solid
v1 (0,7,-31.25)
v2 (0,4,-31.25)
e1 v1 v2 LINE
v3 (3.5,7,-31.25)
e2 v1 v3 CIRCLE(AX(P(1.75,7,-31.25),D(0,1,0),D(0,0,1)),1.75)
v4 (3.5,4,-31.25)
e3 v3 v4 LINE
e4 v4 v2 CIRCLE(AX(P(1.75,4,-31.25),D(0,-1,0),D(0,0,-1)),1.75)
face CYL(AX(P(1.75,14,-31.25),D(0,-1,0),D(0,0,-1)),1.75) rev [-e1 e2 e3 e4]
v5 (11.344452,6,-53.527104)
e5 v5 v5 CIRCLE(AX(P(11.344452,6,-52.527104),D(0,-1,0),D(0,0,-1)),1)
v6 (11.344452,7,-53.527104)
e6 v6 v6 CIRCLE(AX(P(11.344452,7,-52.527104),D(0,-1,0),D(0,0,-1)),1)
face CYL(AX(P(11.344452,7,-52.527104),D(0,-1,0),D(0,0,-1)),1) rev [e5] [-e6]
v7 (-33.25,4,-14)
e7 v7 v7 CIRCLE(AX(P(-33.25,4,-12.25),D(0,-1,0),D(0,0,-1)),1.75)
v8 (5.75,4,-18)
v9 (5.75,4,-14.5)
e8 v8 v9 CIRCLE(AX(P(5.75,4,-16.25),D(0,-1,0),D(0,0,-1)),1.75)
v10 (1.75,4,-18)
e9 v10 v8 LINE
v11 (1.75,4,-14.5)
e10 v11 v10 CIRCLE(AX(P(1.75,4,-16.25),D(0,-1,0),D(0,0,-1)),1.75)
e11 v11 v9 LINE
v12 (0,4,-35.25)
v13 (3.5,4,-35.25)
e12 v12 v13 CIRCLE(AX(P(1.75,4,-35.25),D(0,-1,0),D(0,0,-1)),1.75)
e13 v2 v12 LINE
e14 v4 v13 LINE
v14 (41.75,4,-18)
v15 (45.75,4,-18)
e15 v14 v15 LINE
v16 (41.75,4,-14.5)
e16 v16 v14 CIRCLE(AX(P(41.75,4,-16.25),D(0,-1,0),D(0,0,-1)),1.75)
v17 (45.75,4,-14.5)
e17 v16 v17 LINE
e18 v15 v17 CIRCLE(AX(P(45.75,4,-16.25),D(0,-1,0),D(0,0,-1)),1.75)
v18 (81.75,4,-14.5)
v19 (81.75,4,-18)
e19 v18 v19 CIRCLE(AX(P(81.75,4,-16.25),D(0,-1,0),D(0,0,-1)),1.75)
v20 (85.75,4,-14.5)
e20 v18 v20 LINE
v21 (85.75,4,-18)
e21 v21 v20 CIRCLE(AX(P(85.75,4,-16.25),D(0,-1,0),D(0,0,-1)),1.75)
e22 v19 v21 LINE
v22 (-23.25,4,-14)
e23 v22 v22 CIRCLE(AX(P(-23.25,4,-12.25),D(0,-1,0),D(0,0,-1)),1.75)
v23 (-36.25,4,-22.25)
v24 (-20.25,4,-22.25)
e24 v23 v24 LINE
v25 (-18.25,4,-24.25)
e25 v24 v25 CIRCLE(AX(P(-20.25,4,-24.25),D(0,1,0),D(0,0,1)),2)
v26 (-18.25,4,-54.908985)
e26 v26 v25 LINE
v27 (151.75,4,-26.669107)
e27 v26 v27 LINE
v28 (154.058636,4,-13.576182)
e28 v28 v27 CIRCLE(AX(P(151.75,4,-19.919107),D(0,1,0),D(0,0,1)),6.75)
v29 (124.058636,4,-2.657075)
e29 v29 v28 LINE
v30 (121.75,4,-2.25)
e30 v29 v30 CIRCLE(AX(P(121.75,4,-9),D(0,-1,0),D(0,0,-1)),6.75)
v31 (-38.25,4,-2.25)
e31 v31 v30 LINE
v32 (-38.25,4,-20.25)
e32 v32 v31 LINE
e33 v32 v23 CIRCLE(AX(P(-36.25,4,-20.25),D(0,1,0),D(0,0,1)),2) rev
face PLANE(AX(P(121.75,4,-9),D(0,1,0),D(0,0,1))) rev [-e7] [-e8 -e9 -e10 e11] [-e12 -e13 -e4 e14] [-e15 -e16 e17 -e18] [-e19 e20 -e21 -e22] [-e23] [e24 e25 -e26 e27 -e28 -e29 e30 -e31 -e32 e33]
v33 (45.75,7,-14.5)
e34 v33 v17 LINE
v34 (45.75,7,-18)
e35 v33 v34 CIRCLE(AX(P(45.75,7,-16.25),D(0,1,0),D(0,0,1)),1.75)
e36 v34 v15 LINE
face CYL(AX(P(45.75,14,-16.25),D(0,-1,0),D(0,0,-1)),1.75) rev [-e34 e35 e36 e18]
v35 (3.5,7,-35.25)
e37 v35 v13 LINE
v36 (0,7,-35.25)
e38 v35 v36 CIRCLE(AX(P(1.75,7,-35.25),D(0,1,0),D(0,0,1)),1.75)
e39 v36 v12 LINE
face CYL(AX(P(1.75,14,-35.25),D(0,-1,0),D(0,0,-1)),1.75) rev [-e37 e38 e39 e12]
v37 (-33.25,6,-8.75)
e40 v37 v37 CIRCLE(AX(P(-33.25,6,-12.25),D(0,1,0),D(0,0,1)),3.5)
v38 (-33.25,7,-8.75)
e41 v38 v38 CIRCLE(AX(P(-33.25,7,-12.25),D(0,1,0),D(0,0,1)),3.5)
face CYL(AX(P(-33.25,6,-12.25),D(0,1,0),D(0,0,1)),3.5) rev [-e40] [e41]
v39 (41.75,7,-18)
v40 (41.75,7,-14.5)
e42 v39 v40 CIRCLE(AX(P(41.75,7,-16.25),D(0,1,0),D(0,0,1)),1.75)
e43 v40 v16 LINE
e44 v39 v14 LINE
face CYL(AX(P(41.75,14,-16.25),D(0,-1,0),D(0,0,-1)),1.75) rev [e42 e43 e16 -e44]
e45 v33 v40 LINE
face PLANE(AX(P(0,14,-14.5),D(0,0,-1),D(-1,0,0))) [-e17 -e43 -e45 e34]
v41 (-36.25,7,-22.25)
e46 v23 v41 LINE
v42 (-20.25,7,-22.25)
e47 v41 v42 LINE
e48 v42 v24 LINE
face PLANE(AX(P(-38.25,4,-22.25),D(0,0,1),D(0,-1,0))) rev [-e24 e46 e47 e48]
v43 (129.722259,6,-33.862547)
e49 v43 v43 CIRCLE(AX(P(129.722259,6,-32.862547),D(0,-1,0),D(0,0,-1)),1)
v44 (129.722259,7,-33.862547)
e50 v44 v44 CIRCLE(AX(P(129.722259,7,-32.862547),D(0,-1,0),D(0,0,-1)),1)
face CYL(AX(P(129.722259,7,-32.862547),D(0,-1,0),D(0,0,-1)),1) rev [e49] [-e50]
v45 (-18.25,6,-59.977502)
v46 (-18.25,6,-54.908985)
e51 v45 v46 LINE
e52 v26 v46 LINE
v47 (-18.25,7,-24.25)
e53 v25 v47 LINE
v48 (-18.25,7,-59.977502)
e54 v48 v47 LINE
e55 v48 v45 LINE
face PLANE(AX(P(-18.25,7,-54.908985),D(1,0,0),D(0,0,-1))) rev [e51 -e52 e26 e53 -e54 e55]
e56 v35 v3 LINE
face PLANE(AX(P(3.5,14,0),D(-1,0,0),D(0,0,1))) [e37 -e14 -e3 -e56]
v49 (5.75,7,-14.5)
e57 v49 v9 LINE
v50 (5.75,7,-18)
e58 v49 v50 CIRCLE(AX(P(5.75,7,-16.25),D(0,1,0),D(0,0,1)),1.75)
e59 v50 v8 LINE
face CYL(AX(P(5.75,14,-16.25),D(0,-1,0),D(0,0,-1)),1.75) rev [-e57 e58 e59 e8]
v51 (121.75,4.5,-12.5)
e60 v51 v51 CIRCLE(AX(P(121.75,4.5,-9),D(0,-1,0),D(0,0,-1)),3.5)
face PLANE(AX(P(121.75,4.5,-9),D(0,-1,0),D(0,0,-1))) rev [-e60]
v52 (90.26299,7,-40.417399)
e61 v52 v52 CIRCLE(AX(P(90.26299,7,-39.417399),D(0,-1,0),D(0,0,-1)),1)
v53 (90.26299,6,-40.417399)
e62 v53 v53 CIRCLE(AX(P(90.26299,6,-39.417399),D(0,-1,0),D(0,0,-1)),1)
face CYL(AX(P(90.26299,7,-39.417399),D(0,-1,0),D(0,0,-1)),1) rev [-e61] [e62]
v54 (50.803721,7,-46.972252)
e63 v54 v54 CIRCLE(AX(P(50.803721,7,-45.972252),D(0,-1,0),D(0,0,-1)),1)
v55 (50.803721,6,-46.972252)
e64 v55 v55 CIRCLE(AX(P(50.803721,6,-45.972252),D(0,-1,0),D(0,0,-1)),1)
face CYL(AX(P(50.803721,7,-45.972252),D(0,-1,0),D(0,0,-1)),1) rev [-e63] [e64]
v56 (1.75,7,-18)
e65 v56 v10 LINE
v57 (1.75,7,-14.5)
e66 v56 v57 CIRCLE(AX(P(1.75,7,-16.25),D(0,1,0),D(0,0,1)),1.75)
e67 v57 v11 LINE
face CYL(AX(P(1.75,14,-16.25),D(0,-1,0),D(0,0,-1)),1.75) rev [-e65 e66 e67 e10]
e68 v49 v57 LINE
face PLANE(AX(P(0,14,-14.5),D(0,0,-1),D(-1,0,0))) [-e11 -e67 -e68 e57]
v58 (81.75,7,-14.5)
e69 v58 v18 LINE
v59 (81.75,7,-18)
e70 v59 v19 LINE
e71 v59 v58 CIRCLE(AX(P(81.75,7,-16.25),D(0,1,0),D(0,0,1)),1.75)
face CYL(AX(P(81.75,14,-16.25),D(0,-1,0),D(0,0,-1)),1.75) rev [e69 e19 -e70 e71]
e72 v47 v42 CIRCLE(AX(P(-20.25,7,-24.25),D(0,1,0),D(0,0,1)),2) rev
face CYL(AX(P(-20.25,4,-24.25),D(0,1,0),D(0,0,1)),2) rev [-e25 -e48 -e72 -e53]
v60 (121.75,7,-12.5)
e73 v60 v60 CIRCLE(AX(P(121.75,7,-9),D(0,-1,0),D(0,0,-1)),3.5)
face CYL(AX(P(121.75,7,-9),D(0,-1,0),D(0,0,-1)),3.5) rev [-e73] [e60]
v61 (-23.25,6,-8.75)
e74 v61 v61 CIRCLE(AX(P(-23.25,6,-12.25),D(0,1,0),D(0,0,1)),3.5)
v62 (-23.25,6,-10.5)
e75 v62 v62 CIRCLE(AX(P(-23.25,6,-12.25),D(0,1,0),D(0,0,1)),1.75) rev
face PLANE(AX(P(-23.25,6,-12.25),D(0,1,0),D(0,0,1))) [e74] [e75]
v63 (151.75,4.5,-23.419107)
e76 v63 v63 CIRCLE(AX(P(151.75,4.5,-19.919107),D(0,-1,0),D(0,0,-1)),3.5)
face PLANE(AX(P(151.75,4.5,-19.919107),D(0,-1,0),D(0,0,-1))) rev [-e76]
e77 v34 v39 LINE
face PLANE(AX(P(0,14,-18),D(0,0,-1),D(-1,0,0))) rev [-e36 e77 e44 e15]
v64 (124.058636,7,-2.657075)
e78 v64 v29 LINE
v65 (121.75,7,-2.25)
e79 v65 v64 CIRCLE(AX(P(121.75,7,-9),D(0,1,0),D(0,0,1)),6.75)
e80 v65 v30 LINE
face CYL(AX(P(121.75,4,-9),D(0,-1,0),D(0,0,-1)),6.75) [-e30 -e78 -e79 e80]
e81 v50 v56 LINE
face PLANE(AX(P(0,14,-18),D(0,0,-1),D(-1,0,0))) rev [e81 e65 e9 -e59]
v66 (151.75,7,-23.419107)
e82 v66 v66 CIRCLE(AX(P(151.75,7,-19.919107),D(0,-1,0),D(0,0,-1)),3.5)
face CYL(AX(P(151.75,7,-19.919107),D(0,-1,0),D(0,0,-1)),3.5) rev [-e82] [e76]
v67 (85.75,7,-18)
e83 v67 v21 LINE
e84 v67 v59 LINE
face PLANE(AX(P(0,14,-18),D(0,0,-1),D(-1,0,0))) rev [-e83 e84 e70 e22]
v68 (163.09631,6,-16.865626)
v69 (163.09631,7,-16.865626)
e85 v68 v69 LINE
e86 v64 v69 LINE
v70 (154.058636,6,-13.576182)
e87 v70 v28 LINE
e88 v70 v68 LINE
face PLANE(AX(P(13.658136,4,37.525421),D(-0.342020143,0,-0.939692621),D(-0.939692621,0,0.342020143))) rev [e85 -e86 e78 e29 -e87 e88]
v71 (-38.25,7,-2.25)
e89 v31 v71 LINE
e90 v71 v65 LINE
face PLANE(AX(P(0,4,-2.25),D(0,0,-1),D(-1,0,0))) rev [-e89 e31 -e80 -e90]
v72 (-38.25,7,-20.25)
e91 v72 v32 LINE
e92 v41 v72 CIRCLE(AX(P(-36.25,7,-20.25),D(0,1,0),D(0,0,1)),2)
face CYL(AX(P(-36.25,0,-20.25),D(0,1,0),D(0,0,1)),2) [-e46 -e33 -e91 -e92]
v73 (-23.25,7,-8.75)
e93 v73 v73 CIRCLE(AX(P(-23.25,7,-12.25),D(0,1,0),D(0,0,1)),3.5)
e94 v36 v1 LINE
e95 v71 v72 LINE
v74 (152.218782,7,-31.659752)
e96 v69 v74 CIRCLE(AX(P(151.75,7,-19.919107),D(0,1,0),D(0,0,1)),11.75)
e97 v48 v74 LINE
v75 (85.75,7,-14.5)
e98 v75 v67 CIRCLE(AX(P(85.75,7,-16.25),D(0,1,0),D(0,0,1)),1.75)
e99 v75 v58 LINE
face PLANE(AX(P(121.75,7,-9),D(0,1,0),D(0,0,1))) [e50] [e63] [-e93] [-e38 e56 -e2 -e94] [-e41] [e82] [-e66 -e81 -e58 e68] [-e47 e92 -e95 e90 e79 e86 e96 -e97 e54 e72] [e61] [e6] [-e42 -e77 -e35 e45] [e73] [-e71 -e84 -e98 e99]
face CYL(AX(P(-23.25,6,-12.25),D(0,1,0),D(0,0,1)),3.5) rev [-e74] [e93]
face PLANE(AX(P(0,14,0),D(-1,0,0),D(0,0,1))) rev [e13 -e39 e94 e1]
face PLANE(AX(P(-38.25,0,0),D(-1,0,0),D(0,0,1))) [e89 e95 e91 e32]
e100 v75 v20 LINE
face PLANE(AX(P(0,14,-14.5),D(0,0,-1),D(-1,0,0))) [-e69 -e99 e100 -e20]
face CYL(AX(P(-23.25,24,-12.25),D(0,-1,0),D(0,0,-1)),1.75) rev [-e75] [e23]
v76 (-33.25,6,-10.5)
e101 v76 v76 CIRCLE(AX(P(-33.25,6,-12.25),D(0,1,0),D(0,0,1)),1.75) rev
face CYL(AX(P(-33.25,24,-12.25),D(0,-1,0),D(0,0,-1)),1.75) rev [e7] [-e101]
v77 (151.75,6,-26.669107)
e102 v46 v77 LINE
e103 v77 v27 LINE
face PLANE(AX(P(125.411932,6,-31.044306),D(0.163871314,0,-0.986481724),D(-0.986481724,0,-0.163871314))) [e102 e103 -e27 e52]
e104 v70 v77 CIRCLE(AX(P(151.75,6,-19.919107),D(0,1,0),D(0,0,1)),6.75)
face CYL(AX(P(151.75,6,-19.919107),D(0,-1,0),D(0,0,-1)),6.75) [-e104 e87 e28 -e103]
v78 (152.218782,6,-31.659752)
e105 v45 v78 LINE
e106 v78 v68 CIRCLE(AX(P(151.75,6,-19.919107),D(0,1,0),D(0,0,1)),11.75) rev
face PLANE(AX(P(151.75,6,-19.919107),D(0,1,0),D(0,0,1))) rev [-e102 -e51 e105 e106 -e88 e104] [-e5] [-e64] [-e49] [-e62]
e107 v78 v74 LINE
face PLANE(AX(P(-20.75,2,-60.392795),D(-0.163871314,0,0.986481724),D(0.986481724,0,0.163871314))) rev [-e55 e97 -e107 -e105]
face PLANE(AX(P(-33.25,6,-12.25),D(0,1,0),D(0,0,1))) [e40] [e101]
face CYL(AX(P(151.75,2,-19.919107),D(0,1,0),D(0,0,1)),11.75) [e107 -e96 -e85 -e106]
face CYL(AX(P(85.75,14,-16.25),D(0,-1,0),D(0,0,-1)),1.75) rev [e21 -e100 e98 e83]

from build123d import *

# Parameters (mm, degrees)
SKETCH_1_W           = 35
SKETCH_1_H           = 55
EXTRUDE_1_DEPTH      = 1
EXTRUDE_2_DEPTH      = 3
SKETCH_3_R           = 5
CUT_EXTRUDE_1_DEPTH  = 169.569903897
SKETCH_4_R           = 4
CUT_EXTRUDE_2_DEPTH  = 2
SKETCH_5_R           = 2
CUT_EXTRUDE_3_DEPTH  = 2
EXTRUDE_START        = 7
EXTRUDE_3_DEPTH      = 7
CUT_EXTRUDE_START    = -1.5
SKETCH_9_W           = 10
SKETCH_9_H           = 26
CUT_EXTRUDE_4_DEPTH  = 168.318874833
SKETCH_10_R          = 1.5
CUT_EXTRUDE_5_DEPTH  = 194.595583627
EXTRUDE_4_DEPTH      = 3
SKETCH_13_W          = 334.012533363
SKETCH_13_H          = 161.456209481
CUT_EXTRUDE_6_DEPTH  = 10
CUT_EXTRUDE_START_2  = -0.5
SKETCH_14_R          = 3.5
CUT_EXTRUDE_7_DEPTH  = 179.354165453
SKETCH_15_R          = 5
CUT_EXTRUDE_8_DEPTH  = 179.854165453
EXTRUDE_START_2      = -3
EXTRUDE_5_DEPTH      = 16
EXTRUDE_7_DEPTH      = 7
SKETCH_24_W          = 10
SKETCH_24_H          = 26
CUT_EXTRUDE_11_DEPTH = 180.209193181
SKETCH_25_R          = 1.5
CUT_EXTRUDE_12_DEPTH = 176.793913433
THREAD_2_PITCH       = 0.6
CUT_EXTRUDE_13_DEPTH = 181.709193232
EXTRUDE_START_3      = 2
SKETCH_27_R          = 5
EXTRUDE_8_DEPTH      = 2
CUT_EXTRUDE_START_3  = -2
SKETCH_28_W          = 25
SKETCH_28_H          = 47.640496167
CUT_EXTRUDE_14_DEPTH = 182.247184378
SKETCH_29_R          = 7.5
CUT_EXTRUDE_15_DEPTH = 4
CUT_EXTRUDE_16_DEPTH = 10
SKETCH_32_R          = 1.896812978
CUT_EXTRUDE_17_DEPTH = 10
CUT_EXTRUDE_START_4  = -19
CUT_EXTRUDE_18_DEPTH = 2
CUT_EXTRUDE_19_DEPTH = 180.762490825
CUT_EXTRUDE_20_DEPTH = 176.782687167
CUT_EXTRUDE_21_DEPTH = 175.343166372
SKETCH_37_R          = 1
CUT_EXTRUDE_22_DEPTH = 175.199743974
EXTRUDE_START_4      = -1
SKETCH_39_R          = 5
EXTRUDE_9_DEPTH      = 1
SKETCH_40_W          = 2.395962652
SKETCH_40_H          = 5.687033247
CUT_EXTRUDE_23_DEPTH = 192.518571686
SKETCH_41_W          = 88.49347393
SKETCH_41_H          = 24.829104196
CUT_EXTRUDE_24_DEPTH = 192.518571686
SKETCH_42_W          = 20
SKETCH_42_H          = 3
EXTRUDE_10_DEPTH     = 20
SKETCH_43_R          = 1.75
CUT_EXTRUDE_25_DEPTH = 20
SKETCH_45_R          = 3.5
CUT_EXTRUDE_26_DEPTH = 1
FILLET_1_R           = 2


with BuildPart() as part:
    # 草图1 → 凸台-拉伸1 (new body)
    with BuildSketch(Plane(origin=(0, 0, 0), x_dir=(1, 0, 0), z_dir=(0, 1, 0))):
        Rectangle(SKETCH_1_W, SKETCH_1_H)
    extrude(amount=EXTRUDE_1_DEPTH)

    # Sketch 2 → 凸台-拉伸2 (add)
    with BuildSketch(Plane(origin=(0, 1, 0), x_dir=(1, 0, 0), z_dir=(0, 1, 0))):
        with BuildLine():
            Line((106.75, -2.25), (106.75, 2.25))
            Line((106.75, 2.25), (121.75, 2.25))
            ThreePointArc((121.75, 2.25), (122.922125199, 2.352547667), (124.058635967, 2.65707481))
            Line((124.058635967, 2.65707481), (154.058635967, 13.576181838))
            ThreePointArc((154.058635967, 13.576181838), (158.397452333, 21.091232227), (151.75, 26.669107028))
            Line((151.75, 26.669107028), (-31.447415548, 57.101298968))
            ThreePointArc((-31.447415548, 57.101298968), (-37.800418235, 56.264673928), (-42.609265279, 52.029632639))
            Line((-42.609265279, 52.029632639), (-60.161792173, 23.605896086))
            ThreePointArc((-60.161792173, 23.605896086), (-61.717833724, 20.073278016), (-62.25, 16.25))
            Line((-62.25, 16.25), (-62.25, -16.25))
            ThreePointArc((-62.25, -16.25), (-61.717833724, -20.073278016), (-60.161792173, -23.605896086))
            Line((-60.161792173, -23.605896086), (-42.609265279, -52.029632639))
            ThreePointArc((-42.609265279, -52.029632639), (-37.800418235, -56.264673928), (-31.447415548, -57.101298968))
            Line((-31.447415548, -57.101298968), (151.75, -26.669107028))
            ThreePointArc((151.75, -26.669107028), (158.397452333, -21.091232227), (154.058635967, -13.576181838))
            Line((154.058635967, -13.576181838), (124.058635967, -2.65707481))
            ThreePointArc((124.058635967, -2.65707481), (122.922125199, -2.352547667), (121.75, -2.25))
            Line((121.75, -2.25), (106.75, -2.25))
        make_face()
    extrude(amount=EXTRUDE_2_DEPTH)

    # 草图3 → 切除-拉伸1 (cut, through all)
    with BuildSketch(Plane(origin=(0, 4, 0), x_dir=(1, 0, 0), z_dir=(0, 1, 0))):
        with Locations(Location((-48.25, 16.25, 0), (0, 0, 270))):
            Circle(SKETCH_3_R)
        with Locations(Location((-48.25, -16.25, 0), (0, 0, 270))):
            Circle(SKETCH_3_R)
    extrude(amount=-CUT_EXTRUDE_1_DEPTH, mode=Mode.SUBTRACT)

    # 草图4 → 切除-拉伸2 (cut)
    with BuildSketch(Plane(origin=(0, 4, 0), x_dir=(1, 0, 0), z_dir=(0, 1, 0))):
        with Locations(Location((-33.25, 46.25, 0), (0, 0, 270))):
            Circle(SKETCH_4_R)
        with Locations(Location((-33.25, -46.25, 0), (0, 0, 270))):
            Circle(SKETCH_4_R)
    extrude(amount=-CUT_EXTRUDE_2_DEPTH, mode=Mode.SUBTRACT)

    # 草图5 → 切除-拉伸3 (cut)
    with BuildSketch(Plane(origin=(0, 4, 0), x_dir=(1, 0, 0), z_dir=(0, 1, 0))):
        with Locations(Location((121.75, 9, 0), (0, 0, 270))):
            Circle(SKETCH_5_R)
        with Locations(Location((121.75, -9, 0), (0, 0, 270))):
            Circle(SKETCH_5_R)
        with Locations(Location((151.75, 19.919107028, 0), (0, 0, 270))):
            Circle(SKETCH_5_R)
        with Locations(Location((151.75, -19.919107028, 0), (0, 0, 270))):
            Circle(SKETCH_5_R)
    extrude(amount=-CUT_EXTRUDE_3_DEPTH, mode=Mode.SUBTRACT)

    # 草图8 → 凸台-拉伸3 (add)
    with BuildSketch(Plane.XZ.offset(-1).offset(EXTRUDE_START)):
        with BuildLine():
            Line((-26.75, -26.25), (-39.75, -26.25))
            Line((-39.75, -26.25), (-39.75, -55.124119675))
            ThreePointArc((-39.75, -55.124119675), (-35.798281322, -56.950759894), (-31.447415548, -57.101298968))
            Line((-31.447415548, -57.101298968), (-26.75, -56.320978726))
            Line((-26.75, -56.320978726), (-26.75, -26.25))
        make_face()
    extrude_3 = extrude(amount=-EXTRUDE_3_DEPTH)

    # 镜向1: 凸台-拉伸3 across plane
    add(extrude_3.mirror(Plane.XY))

    # 草图9 → 切除-拉伸4 (cut, through all)
    with BuildSketch(Plane.XZ.offset(6).offset(CUT_EXTRUDE_START)):
        with Locations((-33.25, -40.75)):
            Rectangle(SKETCH_9_W, SKETCH_9_H)
    cut_extrude_4 = extrude(amount=-CUT_EXTRUDE_4_DEPTH, mode=Mode.SUBTRACT)

    # 镜向2: 切除-拉伸4 across plane
    add(cut_extrude_4.mirror(Plane.XY), mode=Mode.SUBTRACT)

    # 草图10 → 切除-拉伸5 (cut, through all)
    with BuildSketch(Plane.XY.offset(-53.75)):
        with Locations((-33.25, -1.5)):
            Circle(SKETCH_10_R)
    cut_extrude_5 = extrude(amount=-CUT_EXTRUDE_5_DEPTH, mode=Mode.SUBTRACT)

    # 镜向3: 切除-拉伸5 across plane
    add(cut_extrude_5.mirror(Plane.XY), mode=Mode.SUBTRACT)

    # 草图12 → 凸台-拉伸4 (add)
    with BuildSketch(Plane(origin=(0, 4, 0), x_dir=(1, 0, 0), z_dir=(0, 1, 0))):
        with BuildLine():
            Line((152.536154407, 34.648141662), (-30.136445037, 64.993152763))
            ThreePointArc((-30.136445037, 64.993152763), (-32.296727103, 65.226071005), (-34.469475839, 65.210824842))
            Line((-34.469475839, 65.210824842), (-60.161792173, 23.605896086))
            ThreePointArc((-60.161792173, 23.605896086), (-61.717833724, 20.073278016), (-62.25, 16.25))
            Line((-62.25, 16.25), (-62.25, 2.25))
            Line((-62.25, 2.25), (121.75, 2.25))
            ThreePointArc((121.75, 2.25), (122.922125199, 2.352547667), (124.058635967, 2.65707481))
            Line((124.058635967, 2.65707481), (166.382589153, 18.061733966))
            ThreePointArc((166.382589153, 18.061733966), (163.073058037, 29.371665237), (152.536154407, 34.648141662))
        make_face()
    extrude(amount=EXTRUDE_4_DEPTH)

    # 草图13 → 切除-拉伸6 (cut)
    with BuildSketch(Plane.XZ.offset(-4)):
        with Locations((47.836319436, 6.16656882)):
            Rectangle(SKETCH_13_W, SKETCH_13_H)
    extrude(amount=CUT_EXTRUDE_6_DEPTH, mode=Mode.SUBTRACT)

    # 草图14 → 切除-拉伸7 (cut, through all)
    with BuildSketch(Plane.XZ.offset(-4).offset(CUT_EXTRUDE_START_2)):
        with Locations(Location((151.75, -19.919107028, 0), (0, 0, 270))):
            Circle(SKETCH_14_R)
        with Locations(Location((121.75, -9, 0), (0, 0, 270))):
            Circle(SKETCH_14_R)
    extrude(amount=-CUT_EXTRUDE_7_DEPTH, mode=Mode.SUBTRACT)

    # 草图15 → 切除-拉伸8 (cut, through all)
    with BuildSketch(Plane.XZ.offset(-4)):
        with Locations(Location((-48.25, -16.25, 0), (0, 0, 270))):
            Circle(SKETCH_15_R)
    extrude(amount=-CUT_EXTRUDE_8_DEPTH, mode=Mode.SUBTRACT)

    # 草图17 → 凸台-拉伸5 (add)
    with BuildSketch(Plane.XZ.offset(-4).offset(EXTRUDE_START_2)):
        with BuildLine():
            Line((-30.628058978, -62.03370759), (152.218782473, -31.659751942))
            ThreePointArc((152.218782473, -31.659751942), (161.216553887, -26.879484712), (163.096310198, -16.865626245))
            Line((163.096310198, -16.865626245), (166.382589153, -18.061733966))
            ThreePointArc((166.382589153, -18.061733966), (163.073058037, -29.371665237), (152.536154407, -34.648141662))
            Line((152.536154407, -34.648141662), (-30.136445037, -64.993152763))
            ThreePointArc((-30.136445037, -64.993152763), (-32.296727103, -65.226071005), (-34.469475839, -65.210824842))
            Line((-34.469475839, -65.210824842), (-36.504423199, -61.915526791))
            ThreePointArc((-36.504423199, -61.915526791), (-33.571714316, -62.246765295), (-30.628058978, -62.03370759))
        make_face()
    extrude(amount=-EXTRUDE_5_DEPTH)

    # 草图23 → 凸台-拉伸7 (add)
    with BuildSketch(Plane.XZ.offset(-4).offset(EXTRUDE_START)):
        with BuildLine():
            Line((-39.75, -56.65979236), (-39.75, -26.25))
            Line((-39.75, -26.25), (-26.75, -26.25))
            Line((-26.75, -26.25), (-26.75, -64.430606916))
            Line((-26.75, -64.430606916), (-30.136445037, -64.993152763))
            ThreePointArc((-30.136445037, -64.993152763), (-32.296727103, -65.226071005), (-34.469475839, -65.210824842))
            Line((-34.469475839, -65.210824842), (-39.75, -56.65979236))
        make_face()
    extrude(amount=-EXTRUDE_7_DEPTH)

    # 草图24 → 切除-拉伸11 (cut, through all)
    with BuildSketch(Plane.XZ.offset(3).offset(CUT_EXTRUDE_START)):
        with Locations((-33.25, -40.75)):
            Rectangle(SKETCH_24_W, SKETCH_24_H)
    extrude(amount=-CUT_EXTRUDE_11_DEPTH, mode=Mode.SUBTRACT)

    # 草图25 → 切除-拉伸12 (cut, through all)
    with BuildSketch(Plane.XY.offset(-53.75)):
        with Locations((-33.25, 1.5)):
            Circle(SKETCH_25_R)
    extrude(amount=-CUT_EXTRUDE_12_DEPTH, mode=Mode.SUBTRACT)

    # 螺纹线2: the profile of Sketch 2 2 profile screwed along a right-hand helix of 25 turns, 6 arcs to a turn; built about Z, then put on its axis
    thread_2_z = Axis((0, 0, 0), (0, 0, 1))
    thread_2_corners = [(1.4997, 0, -0.000173205), (1.824759525, 0, 0.187499999), (1.824759525, 0, 0.262499999), (1.4997, 0, 0.450173203)]
    with BuildLine(mode=Mode.PRIVATE) as thread_2_profile:
        Line(thread_2_corners[0], thread_2_corners[1])
        Line(thread_2_corners[1], thread_2_corners[2])
        Line(thread_2_corners[2], thread_2_corners[3])
        Line(thread_2_corners[3], thread_2_corners[0])
    thread_2_cap = Face(thread_2_profile.wire())
    thread_2_turn_angles = [0, 30, 60, 90, 120, 150, 180, 210, 240, 270, 300, 330, 360]
    thread_2_turn_weights = [1, 0.8660254037844387, 1, 0.8660254037844387, 1, 0.8660254037844387, 1, 0.8660254037844387, 1, 0.8660254037844387, 1, 0.8660254037844387, 1]
    thread_2_turn_rails = [Edge.make_bspline([Vector(p[0], p[1], 0).rotate(thread_2_z, thread_2_turn_angles[k]) / thread_2_turn_weights[k] + Vector(0, 0, p[2] + THREAD_2_PITCH * thread_2_turn_angles[k] / 360) for k in range(13)], [0, 0, 0, 1, 1, 2, 2, 3, 3, 4, 4, 5, 5, 6, 6, 6], 2, thread_2_turn_weights) for p in thread_2_corners]
    thread_2_turn_sides = [Face.make_surface_from_curves(thread_2_turn_rails[p[0]], thread_2_turn_rails[p[1]]) for p in [(0, 1), (1, 2), (2, 3), (3, 0)]]
    thread_2 = Plane(origin=(-33.25, 1.5, -53.75), x_dir=(-1, 0, 0), z_dir=(0, 0, -1)) * Solid(Shell([*[p.moved(Location((0, 0, THREAD_2_PITCH * i))) for i in range(25) for p in thread_2_turn_sides], thread_2_cap, thread_2_cap.rotate(thread_2_z, 9000).moved(Location((0, 0, THREAD_2_PITCH * 9000 / 360)))]))
    add(thread_2, mode=Mode.SUBTRACT)

    # 草图26 → 切除-拉伸13 (cut, through all)
    with BuildSketch(Plane.XZ.offset(3)):
        with BuildLine():
            Line((-26.75, -64.430606916), (-26.75, -26.25))
            Line((-26.75, -26.25), (-39.75, -26.25))
            Line((-39.75, -26.25), (-39.75, -56.65979236))
            Line((-39.75, -56.65979236), (-34.469475839, -65.210824842))
            ThreePointArc((-34.469475839, -65.210824842), (-32.296727103, -65.226071005), (-30.136445037, -64.993152763))
            Line((-30.136445037, -64.993152763), (-26.75, -64.430606916))
        make_face()
    extrude(amount=-CUT_EXTRUDE_13_DEPTH, mode=Mode.SUBTRACT)

    # 草图27 → 凸台-拉伸8 (add)
    with BuildSketch(Plane.XZ.offset(-4).offset(EXTRUDE_START_3)):
        with BuildLine():
            Line((-39.75, -56.65979236), (-39.75, -26.25))
            Line((-39.75, -26.25), (-26.75, -26.25))
            Line((-26.75, -26.25), (-26.75, -64.430606916))
            Line((-26.75, -64.430606916), (-18.25, -63.018613025))
            Line((-18.25, -63.018613025), (-18.25, -2.25))
            Line((-18.25, -2.25), (-62.25, -2.25))
            Line((-62.25, -2.25), (-62.25, -16.25))
            ThreePointArc((-62.25, -16.25), (-61.717833724, -20.073278016), (-60.161792173, -23.605896086))
            Line((-60.161792173, -23.605896086), (-39.75, -56.65979236))
        make_face()
        with Locations(Location((-48.25, -16.25, 0), (0, 0, 270))):
            Circle(SKETCH_27_R, mode=Mode.SUBTRACT)
    extrude(amount=-EXTRUDE_8_DEPTH)

    # 草图28 → 切除-拉伸14 (cut, through all)
    with BuildSketch(Plane(origin=(0, 7, 0), x_dir=(1, 0, 0), z_dir=(0, 1, 0)).offset(CUT_EXTRUDE_START_3)):
        with Locations((-33.25, 50.070248084)):
            Rectangle(SKETCH_28_W, SKETCH_28_H)
    extrude(amount=CUT_EXTRUDE_14_DEPTH, mode=Mode.SUBTRACT)

    # 草图29 → 切除-拉伸15 (cut)
    with BuildSketch(Plane(origin=(0, 7, 0), x_dir=(1, 0, 0), z_dir=(0, 1, 0))):
        with Locations(Location((-48.25, 16.25, 0), (0, 0, 270))):
            Circle(SKETCH_29_R)
    extrude(amount=-CUT_EXTRUDE_15_DEPTH, mode=Mode.SUBTRACT)

    # 草图31 → 切除-拉伸16 (cut)
    with BuildSketch(Plane.XZ.offset(-4)):
        with BuildLine():
            Line((7.5, -16.25), (0, -16.25))
            ThreePointArc((0, -16.25), (0.512563133, -17.487436867), (1.75, -18))
            Line((1.75, -18), (5.75, -18))
            ThreePointArc((5.75, -18), (6.987436867, -17.487436867), (7.5, -16.25))
        make_face()
        with BuildLine():
            ThreePointArc((1.75, -14.5), (0.512563133, -15.012563133), (0, -16.25))
            Line((0, -16.25), (7.5, -16.25))
            ThreePointArc((7.5, -16.25), (6.987436867, -15.012563133), (5.75, -14.5))
            Line((5.75, -14.5), (1.75, -14.5))
        make_face()
        with BuildLine():
            Line((47.5, -16.25), (40, -16.25))
            ThreePointArc((40, -16.25), (40.512563133, -17.487436867), (41.75, -18))
            Line((41.75, -18), (45.75, -18))
            ThreePointArc((45.75, -18), (46.987436867, -17.487436867), (47.5, -16.25))
        make_face()
        with BuildLine():
            ThreePointArc((41.75, -14.5), (40.512563133, -15.012563133), (40, -16.25))
            Line((40, -16.25), (47.5, -16.25))
            ThreePointArc((47.5, -16.25), (46.987436867, -15.012563133), (45.75, -14.5))
            Line((45.75, -14.5), (41.75, -14.5))
        make_face()
        with BuildLine():
            ThreePointArc((81.75, -14.5), (80.512563133, -15.012563133), (80, -16.25))
            Line((80, -16.25), (87.5, -16.25))
            ThreePointArc((87.5, -16.25), (86.987436867, -15.012563133), (85.75, -14.5))
            Line((85.75, -14.5), (81.75, -14.5))
        make_face()
        with BuildLine():
            Line((87.5, -16.25), (80, -16.25))
            ThreePointArc((80, -16.25), (80.512563133, -17.487436867), (81.75, -18))
            Line((81.75, -18), (85.75, -18))
            ThreePointArc((85.75, -18), (86.987436867, -17.487436867), (87.5, -16.25))
        make_face()
        with BuildLine():
            Line((0, -31.25), (0, -35.25))
            ThreePointArc((0, -35.25), (1.75, -37), (3.5, -35.25))
            Line((3.5, -35.25), (3.5, -31.25))
            ThreePointArc((3.5, -31.25), (1.75, -29.5), (0, -31.25))
        make_face()
    extrude(amount=-CUT_EXTRUDE_16_DEPTH, mode=Mode.SUBTRACT)

    # 草图32 → 切除-拉伸17 (cut)
    with BuildSketch(Plane(origin=(0, 5, 0), x_dir=(1, 0, 0), z_dir=(0, 1, 0))):
        with Locations(Location((-42.75, 41.25, 0), (0, 0, 270))):
            Circle(SKETCH_32_R)
        with Locations(Location((-42.75, 31.25, 0), (0, 0, 270))):
            Circle(SKETCH_32_R)
        with Locations(Location((-23.607466011, 41.25, 0), (0, 0, 270))):
            Circle(SKETCH_32_R)
        with Locations(Location((-23.607466011, 31.25, 0), (0, 0, 270))):
            Circle(SKETCH_32_R)
    extrude(amount=-CUT_EXTRUDE_17_DEPTH, mode=Mode.SUBTRACT)

    # 草图33 → 切除-拉伸18 (cut)
    with BuildSketch(Plane(origin=(0, 23, 0), x_dir=(1, 0, 0), z_dir=(0, 1, 0)).offset(CUT_EXTRUDE_START_4)):
        with BuildLine():
            Line((-26.75, 56.320978726), (151.75, 26.669107028))
            ThreePointArc((151.75, 26.669107028), (158.397452333, 21.091232227), (154.058635967, 13.576181838))
            Line((154.058635967, 13.576181838), (163.096310198, 16.865626245))
            Line((163.096310198, 16.865626245), (166.382589153, 18.061733966))
            ThreePointArc((166.382589153, 18.061733966), (163.073058037, 29.371665237), (152.536154407, 34.648141662))
            Line((152.536154407, 34.648141662), (-20.75, 63.433905346))
            Line((-20.75, 63.433905346), (-26.75, 64.430606916))
            Line((-26.75, 64.430606916), (-26.75, 56.320978726))
        make_face()
    extrude(amount=CUT_EXTRUDE_18_DEPTH, mode=Mode.SUBTRACT)

    # 草图34 → 切除-拉伸19 (cut, through all)
    with BuildSketch(Plane(origin=(0, 23, 0), x_dir=(1, 0, 0), z_dir=(0, 1, 0))):
        with BuildLine():
            Line((152.536154407, 34.648141662), (-20.75, 63.433905346))
            Line((-20.75, 63.433905346), (-20.75, 60.392794775))
            Line((-20.75, 60.392794775), (152.218782473, 31.659751942))
            ThreePointArc((152.218782473, 31.659751942), (161.216553887, 26.879484712), (163.096310198, 16.865626245))
            Line((163.096310198, 16.865626245), (166.382589153, 18.061733966))
            ThreePointArc((166.382589153, 18.061733966), (163.073058037, 29.371665237), (152.536154407, 34.648141662))
        make_face()
    extrude(amount=-CUT_EXTRUDE_19_DEPTH, mode=Mode.SUBTRACT)

    # 草图35 → 切除-拉伸20 (cut, through all)
    with BuildSketch(Plane.XZ.offset(-6)):
        Polygon((-20.75, -60.392794775), (-20.75, -55.324277157), (-34.501982631, -57.608714269), (-32.134133376, -71.862825995), (-8.577554705, -67.949679505), (-10.126047391, -58.627976401), align=None)
        Polygon((-10.94540396, -53.695567779), (-20.75, -55.324277157), (-20.75, -60.392794775), (-10.126047391, -58.627976401), align=None)
    extrude(amount=CUT_EXTRUDE_20_DEPTH, mode=Mode.SUBTRACT)

    # 草图36 → 切除-拉伸21 (cut, through all)
    with BuildSketch(Plane.XZ.offset(-6)):
        Polygon((-18.25, -54.908984836), (-18.25, -59.977502454), (-20.75, -60.392794775), (-20.75, -55.324277157), align=None)
    extrude(amount=-CUT_EXTRUDE_21_DEPTH, mode=Mode.SUBTRACT)

    # 草图37 → 切除-拉伸22 (cut, through all)
    with BuildSketch(Plane.XZ.offset(-6)):
        with BuildLine():
            ThreePointArc((12.330933455, -52.363232915), (11.180580417, -51.540622505), (10.357970006, -52.690975543))
            Line((10.357970006, -52.690975543), (12.330933455, -52.363232915))
        make_face()
        with BuildLine():
            Line((12.330933455, -52.363232915), (10.357970006, -52.690975543))
            ThreePointArc((10.357970006, -52.690975543), (11.426665707, -53.52371893), (12.344451731, -52.527104229))
            ThreePointArc((12.344451731, -52.527104229), (12.341066432, -52.444890254), (12.330933455, -52.363232915))
        make_face()
        with BuildLine():
            ThreePointArc((130.708740378, -32.698675253), (129.55838734, -31.876064842), (128.73577693, -33.02641788))
            Line((128.73577693, -33.02641788), (130.708740378, -32.698675253))
        make_face()
        with BuildLine():
            Line((130.708740378, -32.698675253), (128.73577693, -33.02641788))
            ThreePointArc((128.73577693, -33.02641788), (129.80447263, -33.859161267), (130.722258654, -32.862546567))
            ThreePointArc((130.722258654, -32.862546567), (130.718873355, -32.780332591), (130.708740378, -32.698675253))
        make_face()
        with Locations(Location((50.803720705, -45.972251675, 0), (0, 0, 270))):
            Circle(SKETCH_37_R)
        with Locations(Location((90.26298968, -39.417399121, 0), (0, 0, 270))):
            Circle(SKETCH_37_R)
    extrude(amount=-CUT_EXTRUDE_22_DEPTH, mode=Mode.SUBTRACT)

    # 草图39 → 凸台-拉伸9 (add)
    with BuildSketch(Plane(origin=(0, 3, 0), x_dir=(1, 0, 0), z_dir=(0, 1, 0)).offset(EXTRUDE_START_4)):
        with Locations((-48.25, 16.25)):
            Circle(SKETCH_39_R)
    extrude(amount=EXTRUDE_9_DEPTH)

    # 草图40 → 切除-拉伸23 (cut, through all)
    with BuildSketch(Plane.ZY.offset(18.25)):
        with Locations((-56.106966162, 4.156483376)):
            Rectangle(SKETCH_40_W, SKETCH_40_H)
    extrude(amount=CUT_EXTRUDE_23_DEPTH, mode=Mode.SUBTRACT)

    # 草图41 → 切除-拉伸24 (cut, through all)
    with BuildSketch(Plane(origin=(-18.25, 0, 0), x_dir=(0, 0, -1), z_dir=(1, 0, 0))):
        with Locations((34.742620302, 5.018629916)):
            Rectangle(SKETCH_41_W, SKETCH_41_H)
    extrude(amount=-CUT_EXTRUDE_24_DEPTH, mode=Mode.SUBTRACT)

    # 草图42 → 凸台-拉伸10 (add)
    with BuildSketch(Plane.ZY.offset(18.25)):
        with Locations((-12.25, 5.5)):
            Rectangle(SKETCH_42_W, SKETCH_42_H)
    extrude(amount=EXTRUDE_10_DEPTH)

    # 草图43 → 切除-拉伸25 (cut)
    with BuildSketch(Plane.XZ.offset(-4)):
        with Locations(Location((-33.25, -12.25, 0), (0, 0, 270))):
            Circle(SKETCH_43_R)
        with Locations(Location((-23.25, -12.25, 0), (0, 0, 270))):
            Circle(SKETCH_43_R)
    extrude(amount=-CUT_EXTRUDE_25_DEPTH, mode=Mode.SUBTRACT)

    # 草图45 → 切除-拉伸26 (cut)
    with BuildSketch(Plane(origin=(0, 7, 0), x_dir=(1, 0, 0), z_dir=(0, 1, 0))):
        with Locations(Location((-33.25, 12.25, 0), (0, 0, 270))):
            Circle(SKETCH_45_R)
        with Locations(Location((-23.25, 12.25, 0), (0, 0, 270))):
            Circle(SKETCH_45_R)
    extrude(amount=-CUT_EXTRUDE_26_DEPTH, mode=Mode.SUBTRACT)

    # 圆角1
    fillet_1_edges = [part.edges().sort_by_distance(p)[0] for p in [
        (-18.25, 5.5, -22.25),
        (-38.25, 5.5, -22.25),
    ]]
    fillet(fillet_1_edges, radius=FILLET_1_R)


solid = part.part
